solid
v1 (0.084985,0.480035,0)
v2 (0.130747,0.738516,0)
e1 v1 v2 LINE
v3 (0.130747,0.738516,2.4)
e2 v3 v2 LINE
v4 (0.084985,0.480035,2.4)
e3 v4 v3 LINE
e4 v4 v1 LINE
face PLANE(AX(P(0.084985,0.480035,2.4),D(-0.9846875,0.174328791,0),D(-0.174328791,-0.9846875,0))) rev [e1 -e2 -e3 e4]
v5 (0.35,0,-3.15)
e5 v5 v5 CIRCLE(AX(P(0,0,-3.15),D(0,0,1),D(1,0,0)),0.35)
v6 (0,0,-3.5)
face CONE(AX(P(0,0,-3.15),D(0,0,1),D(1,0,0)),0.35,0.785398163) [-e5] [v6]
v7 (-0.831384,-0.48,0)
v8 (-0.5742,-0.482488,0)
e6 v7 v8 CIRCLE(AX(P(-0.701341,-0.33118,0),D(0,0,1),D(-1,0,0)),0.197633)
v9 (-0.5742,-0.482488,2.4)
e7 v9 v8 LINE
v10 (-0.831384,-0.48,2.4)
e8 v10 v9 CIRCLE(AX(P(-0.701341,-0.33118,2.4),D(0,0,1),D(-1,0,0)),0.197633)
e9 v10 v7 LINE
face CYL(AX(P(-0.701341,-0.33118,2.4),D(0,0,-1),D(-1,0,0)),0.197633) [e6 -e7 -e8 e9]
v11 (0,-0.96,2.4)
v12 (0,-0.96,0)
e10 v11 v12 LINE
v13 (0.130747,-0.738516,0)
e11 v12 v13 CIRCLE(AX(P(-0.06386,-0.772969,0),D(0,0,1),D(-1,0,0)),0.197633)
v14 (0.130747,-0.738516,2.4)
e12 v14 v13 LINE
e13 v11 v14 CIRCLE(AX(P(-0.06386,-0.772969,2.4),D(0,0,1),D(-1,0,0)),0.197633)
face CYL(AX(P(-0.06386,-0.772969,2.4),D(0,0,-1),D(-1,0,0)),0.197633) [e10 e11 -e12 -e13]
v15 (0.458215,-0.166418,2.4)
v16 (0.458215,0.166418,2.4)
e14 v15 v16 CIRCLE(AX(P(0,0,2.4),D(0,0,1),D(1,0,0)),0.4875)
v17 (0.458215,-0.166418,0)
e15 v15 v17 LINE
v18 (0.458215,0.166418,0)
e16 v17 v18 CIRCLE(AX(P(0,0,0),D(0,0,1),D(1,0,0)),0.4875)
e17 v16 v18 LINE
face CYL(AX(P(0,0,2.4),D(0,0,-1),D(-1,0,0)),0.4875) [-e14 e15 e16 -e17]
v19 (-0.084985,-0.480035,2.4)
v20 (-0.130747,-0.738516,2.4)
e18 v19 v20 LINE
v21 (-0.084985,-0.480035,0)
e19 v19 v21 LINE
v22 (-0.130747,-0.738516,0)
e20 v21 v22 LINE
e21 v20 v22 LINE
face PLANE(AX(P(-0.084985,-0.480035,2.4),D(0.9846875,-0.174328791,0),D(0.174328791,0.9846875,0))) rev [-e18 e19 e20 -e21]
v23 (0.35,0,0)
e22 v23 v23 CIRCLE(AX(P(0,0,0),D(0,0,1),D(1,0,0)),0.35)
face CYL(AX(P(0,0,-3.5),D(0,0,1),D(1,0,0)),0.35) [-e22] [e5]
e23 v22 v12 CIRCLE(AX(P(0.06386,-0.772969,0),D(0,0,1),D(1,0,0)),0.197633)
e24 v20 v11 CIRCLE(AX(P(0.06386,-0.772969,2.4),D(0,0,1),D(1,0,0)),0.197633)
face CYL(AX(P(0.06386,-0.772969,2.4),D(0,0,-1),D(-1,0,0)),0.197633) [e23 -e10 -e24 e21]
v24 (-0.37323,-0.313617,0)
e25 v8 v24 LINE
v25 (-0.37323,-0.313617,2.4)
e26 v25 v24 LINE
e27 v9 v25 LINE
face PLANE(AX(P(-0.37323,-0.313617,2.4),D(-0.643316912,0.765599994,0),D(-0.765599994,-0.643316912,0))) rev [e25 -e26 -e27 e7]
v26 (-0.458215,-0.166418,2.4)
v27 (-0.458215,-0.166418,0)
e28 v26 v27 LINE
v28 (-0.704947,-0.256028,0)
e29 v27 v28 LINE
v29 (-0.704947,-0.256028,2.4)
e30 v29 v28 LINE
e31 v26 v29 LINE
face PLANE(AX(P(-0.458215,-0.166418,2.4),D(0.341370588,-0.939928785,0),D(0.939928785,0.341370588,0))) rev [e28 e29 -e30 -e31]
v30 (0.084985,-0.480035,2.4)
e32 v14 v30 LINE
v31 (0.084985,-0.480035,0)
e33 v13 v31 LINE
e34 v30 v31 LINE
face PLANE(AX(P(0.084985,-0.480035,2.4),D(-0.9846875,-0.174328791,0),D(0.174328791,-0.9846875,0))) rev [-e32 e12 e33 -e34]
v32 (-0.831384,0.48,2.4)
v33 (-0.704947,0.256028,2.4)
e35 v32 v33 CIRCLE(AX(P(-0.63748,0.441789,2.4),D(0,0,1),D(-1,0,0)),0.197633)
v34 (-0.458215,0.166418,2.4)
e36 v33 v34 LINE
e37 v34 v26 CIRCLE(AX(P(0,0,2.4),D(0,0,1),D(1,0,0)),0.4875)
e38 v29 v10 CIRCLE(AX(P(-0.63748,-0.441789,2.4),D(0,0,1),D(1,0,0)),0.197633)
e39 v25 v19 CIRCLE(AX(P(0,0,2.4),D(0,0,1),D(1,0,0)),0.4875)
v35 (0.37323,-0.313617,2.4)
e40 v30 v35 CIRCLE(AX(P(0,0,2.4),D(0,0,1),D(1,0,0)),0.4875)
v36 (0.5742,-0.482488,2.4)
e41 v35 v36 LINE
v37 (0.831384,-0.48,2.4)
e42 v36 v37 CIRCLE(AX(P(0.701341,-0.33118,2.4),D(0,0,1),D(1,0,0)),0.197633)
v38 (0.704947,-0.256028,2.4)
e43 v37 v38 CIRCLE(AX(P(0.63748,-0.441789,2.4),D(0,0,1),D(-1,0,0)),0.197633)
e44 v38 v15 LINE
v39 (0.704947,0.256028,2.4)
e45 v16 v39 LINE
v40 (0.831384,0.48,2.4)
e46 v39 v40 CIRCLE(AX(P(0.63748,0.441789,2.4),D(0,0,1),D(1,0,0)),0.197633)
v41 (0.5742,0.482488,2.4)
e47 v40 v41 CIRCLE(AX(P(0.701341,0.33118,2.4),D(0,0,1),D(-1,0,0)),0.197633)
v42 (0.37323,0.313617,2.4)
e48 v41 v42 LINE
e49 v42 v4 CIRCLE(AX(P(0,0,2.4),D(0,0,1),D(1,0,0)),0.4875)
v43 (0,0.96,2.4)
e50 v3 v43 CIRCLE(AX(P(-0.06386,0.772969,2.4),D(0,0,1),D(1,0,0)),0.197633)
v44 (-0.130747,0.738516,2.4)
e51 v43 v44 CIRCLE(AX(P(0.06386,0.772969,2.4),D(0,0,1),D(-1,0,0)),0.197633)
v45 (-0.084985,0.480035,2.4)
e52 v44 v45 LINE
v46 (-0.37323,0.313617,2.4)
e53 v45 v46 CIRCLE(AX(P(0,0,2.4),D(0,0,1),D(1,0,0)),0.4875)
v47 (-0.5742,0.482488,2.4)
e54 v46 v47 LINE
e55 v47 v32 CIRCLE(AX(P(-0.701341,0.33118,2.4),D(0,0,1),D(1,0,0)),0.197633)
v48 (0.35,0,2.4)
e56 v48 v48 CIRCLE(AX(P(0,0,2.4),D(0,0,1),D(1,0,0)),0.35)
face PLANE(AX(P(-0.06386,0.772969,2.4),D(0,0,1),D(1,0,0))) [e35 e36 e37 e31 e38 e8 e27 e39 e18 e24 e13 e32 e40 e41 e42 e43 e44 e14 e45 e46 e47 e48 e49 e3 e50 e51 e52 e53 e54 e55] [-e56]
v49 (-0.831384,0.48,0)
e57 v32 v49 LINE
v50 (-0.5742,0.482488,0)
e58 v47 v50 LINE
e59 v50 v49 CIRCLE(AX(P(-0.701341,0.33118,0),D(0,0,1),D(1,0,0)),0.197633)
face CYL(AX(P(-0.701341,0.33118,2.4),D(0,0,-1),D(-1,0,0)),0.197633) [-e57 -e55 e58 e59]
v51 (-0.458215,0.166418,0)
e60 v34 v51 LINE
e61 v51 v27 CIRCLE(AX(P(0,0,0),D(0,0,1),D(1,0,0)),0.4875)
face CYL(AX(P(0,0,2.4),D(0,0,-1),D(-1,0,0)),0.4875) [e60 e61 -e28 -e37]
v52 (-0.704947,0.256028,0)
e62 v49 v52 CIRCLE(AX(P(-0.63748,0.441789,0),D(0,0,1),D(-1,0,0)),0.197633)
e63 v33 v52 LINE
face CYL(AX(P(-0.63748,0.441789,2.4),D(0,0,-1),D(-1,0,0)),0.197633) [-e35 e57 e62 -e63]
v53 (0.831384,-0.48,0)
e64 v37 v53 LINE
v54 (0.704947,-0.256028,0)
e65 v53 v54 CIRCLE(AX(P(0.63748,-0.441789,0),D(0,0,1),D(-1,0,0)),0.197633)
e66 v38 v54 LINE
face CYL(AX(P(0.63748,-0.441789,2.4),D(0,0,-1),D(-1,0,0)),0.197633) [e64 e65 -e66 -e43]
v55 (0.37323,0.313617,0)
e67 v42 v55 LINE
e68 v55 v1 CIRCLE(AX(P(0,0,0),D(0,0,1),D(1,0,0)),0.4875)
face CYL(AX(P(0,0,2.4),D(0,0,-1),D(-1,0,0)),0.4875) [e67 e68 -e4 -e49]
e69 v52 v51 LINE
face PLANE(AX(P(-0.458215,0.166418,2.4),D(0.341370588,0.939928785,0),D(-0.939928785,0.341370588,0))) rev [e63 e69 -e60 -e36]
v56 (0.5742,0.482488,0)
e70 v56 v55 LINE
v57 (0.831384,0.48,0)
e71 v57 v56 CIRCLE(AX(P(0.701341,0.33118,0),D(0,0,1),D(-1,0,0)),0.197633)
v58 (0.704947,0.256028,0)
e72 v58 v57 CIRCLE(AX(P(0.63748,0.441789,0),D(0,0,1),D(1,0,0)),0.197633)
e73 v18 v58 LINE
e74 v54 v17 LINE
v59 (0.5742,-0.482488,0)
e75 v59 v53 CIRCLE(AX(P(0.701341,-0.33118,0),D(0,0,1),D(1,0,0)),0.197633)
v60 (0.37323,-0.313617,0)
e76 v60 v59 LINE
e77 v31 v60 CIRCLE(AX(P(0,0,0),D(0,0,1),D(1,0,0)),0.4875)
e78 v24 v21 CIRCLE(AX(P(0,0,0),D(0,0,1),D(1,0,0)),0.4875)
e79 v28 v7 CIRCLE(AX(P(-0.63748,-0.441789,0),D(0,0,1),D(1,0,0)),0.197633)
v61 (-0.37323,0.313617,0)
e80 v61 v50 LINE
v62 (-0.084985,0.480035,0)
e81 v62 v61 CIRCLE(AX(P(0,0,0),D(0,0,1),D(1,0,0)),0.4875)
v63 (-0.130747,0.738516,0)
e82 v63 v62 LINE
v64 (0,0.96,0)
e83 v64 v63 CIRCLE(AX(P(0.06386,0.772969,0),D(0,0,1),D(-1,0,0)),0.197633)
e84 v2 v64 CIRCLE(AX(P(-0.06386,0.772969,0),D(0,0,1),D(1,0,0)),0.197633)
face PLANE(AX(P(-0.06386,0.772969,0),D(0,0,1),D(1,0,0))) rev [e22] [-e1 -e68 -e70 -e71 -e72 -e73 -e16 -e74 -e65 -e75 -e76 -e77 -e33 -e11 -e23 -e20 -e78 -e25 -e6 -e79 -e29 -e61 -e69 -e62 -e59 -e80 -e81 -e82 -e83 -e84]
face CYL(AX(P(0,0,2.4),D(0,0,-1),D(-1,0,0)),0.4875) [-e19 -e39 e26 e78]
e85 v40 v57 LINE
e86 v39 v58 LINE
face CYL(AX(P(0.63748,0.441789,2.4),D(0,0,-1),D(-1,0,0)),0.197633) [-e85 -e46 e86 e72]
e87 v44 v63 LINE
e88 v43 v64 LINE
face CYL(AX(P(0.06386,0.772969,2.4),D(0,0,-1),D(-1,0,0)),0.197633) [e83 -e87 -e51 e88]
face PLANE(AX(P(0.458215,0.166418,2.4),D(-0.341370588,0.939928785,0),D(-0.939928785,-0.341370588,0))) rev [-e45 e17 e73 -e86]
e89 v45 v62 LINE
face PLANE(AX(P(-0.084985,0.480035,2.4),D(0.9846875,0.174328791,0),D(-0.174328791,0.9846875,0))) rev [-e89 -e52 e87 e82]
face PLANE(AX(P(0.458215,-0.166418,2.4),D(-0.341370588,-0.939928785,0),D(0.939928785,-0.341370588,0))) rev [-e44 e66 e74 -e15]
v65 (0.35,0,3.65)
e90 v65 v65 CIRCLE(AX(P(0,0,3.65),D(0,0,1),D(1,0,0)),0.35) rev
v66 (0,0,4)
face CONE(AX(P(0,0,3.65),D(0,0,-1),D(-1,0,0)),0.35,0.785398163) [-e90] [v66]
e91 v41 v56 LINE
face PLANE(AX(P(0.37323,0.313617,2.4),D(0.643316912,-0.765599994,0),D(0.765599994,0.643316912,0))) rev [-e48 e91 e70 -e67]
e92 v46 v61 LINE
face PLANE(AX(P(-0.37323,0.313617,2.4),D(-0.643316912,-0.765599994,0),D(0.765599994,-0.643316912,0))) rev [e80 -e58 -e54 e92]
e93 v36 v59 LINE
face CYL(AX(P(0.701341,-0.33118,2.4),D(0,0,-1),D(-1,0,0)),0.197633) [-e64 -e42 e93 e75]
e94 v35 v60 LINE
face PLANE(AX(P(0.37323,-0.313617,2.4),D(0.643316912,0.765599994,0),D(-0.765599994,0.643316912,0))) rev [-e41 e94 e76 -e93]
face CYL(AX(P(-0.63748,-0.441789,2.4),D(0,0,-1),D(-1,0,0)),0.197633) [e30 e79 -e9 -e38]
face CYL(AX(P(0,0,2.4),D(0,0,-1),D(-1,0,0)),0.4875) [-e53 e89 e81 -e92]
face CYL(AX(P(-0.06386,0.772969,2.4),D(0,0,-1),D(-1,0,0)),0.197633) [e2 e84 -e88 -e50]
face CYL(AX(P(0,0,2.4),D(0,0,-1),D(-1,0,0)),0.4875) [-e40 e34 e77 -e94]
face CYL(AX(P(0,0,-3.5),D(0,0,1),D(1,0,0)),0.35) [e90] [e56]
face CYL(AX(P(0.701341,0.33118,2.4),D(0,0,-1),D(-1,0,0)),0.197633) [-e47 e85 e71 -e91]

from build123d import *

# Parameters (mm, degrees)
SKETCH2_R                = 0.35
BOSS_EXTRUDE2_DEPTH      = 2.4
BOSS_EXTRUDE3_DEPTH      = 4
BOSS_EXTRUDE3_DEPTH_BACK = 3.5
SKETCH2_2_R              = 0.35
CHAMFER1_SIZE            = 0.35


with BuildPart() as part:
    # Sketch2 → Boss-Extrude2 (new body)
    with BuildSketch(Plane.XY):
        with BuildLine():
            Line((-0.084985286, 0.480035156), (-0.130746593, 0.738515625))
            ThreePointArc((-0.130746593, 0.738515625), (-0.106331255, 0.873436103), (0, 0.96))
            ThreePointArc((0, 0.96), (0.106331255, 0.873436103), (0.130746593, 0.738515625))
            Line((0.130746593, 0.738515625), (0.084985286, 0.480035156))
            ThreePointArc((0.084985286, 0.480035156), (0.24375, 0.422187384), (0.373229997, 0.313616994))
            Line((0.373229997, 0.313616994), (0.574199996, 0.482487684))
            ThreePointArc((0.574199996, 0.482487684), (0.703252226, 0.528803619), (0.831384388, 0.48))
            ThreePointArc((0.831384388, 0.48), (0.809583481, 0.344632483), (0.704946589, 0.256027941))
            Line((0.704946589, 0.256027941), (0.458215283, 0.166418162))
            ThreePointArc((0.458215283, 0.166418162), (0.4875, 0), (0.458215283, -0.166418162))
            Line((0.458215283, -0.166418162), (0.704946589, -0.256027941))
            ThreePointArc((0.704946589, -0.256027941), (0.809583481, -0.344632483), (0.831384388, -0.48))
            ThreePointArc((0.831384388, -0.48), (0.703252226, -0.528803619), (0.574199996, -0.482487684))
            Line((0.574199996, -0.482487684), (0.373229997, -0.313616994))
            ThreePointArc((0.373229997, -0.313616994), (0.24375, -0.422187384), (0.084985286, -0.480035156))
            Line((0.084985286, -0.480035156), (0.130746593, -0.738515625))
            ThreePointArc((0.130746593, -0.738515625), (0.106331255, -0.873436103), (0, -0.96))
            ThreePointArc((0, -0.96), (-0.106331255, -0.873436103), (-0.130746593, -0.738515625))
            Line((-0.130746593, -0.738515625), (-0.084985286, -0.480035156))
            ThreePointArc((-0.084985286, -0.480035156), (-0.24375, -0.422187384), (-0.373229997, -0.313616994))
            Line((-0.373229997, -0.313616994), (-0.574199996, -0.482487684))
            ThreePointArc((-0.574199996, -0.482487684), (-0.703252226, -0.528803619), (-0.831384388, -0.48))
            ThreePointArc((-0.831384388, -0.48), (-0.809583481, -0.344632483), (-0.704946589, -0.256027941))
            Line((-0.704946589, -0.256027941), (-0.458215283, -0.166418162))
            ThreePointArc((-0.458215283, -0.166418162), (-0.4875, 0), (-0.458215283, 0.166418162))
            Line((-0.458215283, 0.166418162), (-0.704946589, 0.256027941))
            ThreePointArc((-0.704946589, 0.256027941), (-0.809583481, 0.344632483), (-0.831384388, 0.48))
            ThreePointArc((-0.831384388, 0.48), (-0.703252226, 0.528803619), (-0.574199996, 0.482487684))
            Line((-0.574199996, 0.482487684), (-0.373229997, 0.313616994))
            ThreePointArc((-0.373229997, 0.313616994), (-0.24375, 0.422187384), (-0.084985286, 0.480035156))
        make_face()
        Circle(SKETCH2_R, mode=Mode.SUBTRACT)
    extrude(amount=BOSS_EXTRUDE2_DEPTH)

    # Sketch2<2> → Boss-Extrude3 (add, two sides: drawn at the far end of the back side and taken through both)
    with BuildSketch(Plane.XY.offset(-BOSS_EXTRUDE3_DEPTH_BACK)):
        Circle(SKETCH2_2_R)
    extrude(amount=BOSS_EXTRUDE3_DEPTH + BOSS_EXTRUDE3_DEPTH_BACK)

    # Chamfer1
    chamfer1_edges = [part.edges().sort_by_distance(p)[0] for p in [
        (-0.35, 0, -3.5),
        (-0.35, 0, 4),
    ]]
    chamfer(chamfer1_edges, length=CHAMFER1_SIZE)


solid = part.part
